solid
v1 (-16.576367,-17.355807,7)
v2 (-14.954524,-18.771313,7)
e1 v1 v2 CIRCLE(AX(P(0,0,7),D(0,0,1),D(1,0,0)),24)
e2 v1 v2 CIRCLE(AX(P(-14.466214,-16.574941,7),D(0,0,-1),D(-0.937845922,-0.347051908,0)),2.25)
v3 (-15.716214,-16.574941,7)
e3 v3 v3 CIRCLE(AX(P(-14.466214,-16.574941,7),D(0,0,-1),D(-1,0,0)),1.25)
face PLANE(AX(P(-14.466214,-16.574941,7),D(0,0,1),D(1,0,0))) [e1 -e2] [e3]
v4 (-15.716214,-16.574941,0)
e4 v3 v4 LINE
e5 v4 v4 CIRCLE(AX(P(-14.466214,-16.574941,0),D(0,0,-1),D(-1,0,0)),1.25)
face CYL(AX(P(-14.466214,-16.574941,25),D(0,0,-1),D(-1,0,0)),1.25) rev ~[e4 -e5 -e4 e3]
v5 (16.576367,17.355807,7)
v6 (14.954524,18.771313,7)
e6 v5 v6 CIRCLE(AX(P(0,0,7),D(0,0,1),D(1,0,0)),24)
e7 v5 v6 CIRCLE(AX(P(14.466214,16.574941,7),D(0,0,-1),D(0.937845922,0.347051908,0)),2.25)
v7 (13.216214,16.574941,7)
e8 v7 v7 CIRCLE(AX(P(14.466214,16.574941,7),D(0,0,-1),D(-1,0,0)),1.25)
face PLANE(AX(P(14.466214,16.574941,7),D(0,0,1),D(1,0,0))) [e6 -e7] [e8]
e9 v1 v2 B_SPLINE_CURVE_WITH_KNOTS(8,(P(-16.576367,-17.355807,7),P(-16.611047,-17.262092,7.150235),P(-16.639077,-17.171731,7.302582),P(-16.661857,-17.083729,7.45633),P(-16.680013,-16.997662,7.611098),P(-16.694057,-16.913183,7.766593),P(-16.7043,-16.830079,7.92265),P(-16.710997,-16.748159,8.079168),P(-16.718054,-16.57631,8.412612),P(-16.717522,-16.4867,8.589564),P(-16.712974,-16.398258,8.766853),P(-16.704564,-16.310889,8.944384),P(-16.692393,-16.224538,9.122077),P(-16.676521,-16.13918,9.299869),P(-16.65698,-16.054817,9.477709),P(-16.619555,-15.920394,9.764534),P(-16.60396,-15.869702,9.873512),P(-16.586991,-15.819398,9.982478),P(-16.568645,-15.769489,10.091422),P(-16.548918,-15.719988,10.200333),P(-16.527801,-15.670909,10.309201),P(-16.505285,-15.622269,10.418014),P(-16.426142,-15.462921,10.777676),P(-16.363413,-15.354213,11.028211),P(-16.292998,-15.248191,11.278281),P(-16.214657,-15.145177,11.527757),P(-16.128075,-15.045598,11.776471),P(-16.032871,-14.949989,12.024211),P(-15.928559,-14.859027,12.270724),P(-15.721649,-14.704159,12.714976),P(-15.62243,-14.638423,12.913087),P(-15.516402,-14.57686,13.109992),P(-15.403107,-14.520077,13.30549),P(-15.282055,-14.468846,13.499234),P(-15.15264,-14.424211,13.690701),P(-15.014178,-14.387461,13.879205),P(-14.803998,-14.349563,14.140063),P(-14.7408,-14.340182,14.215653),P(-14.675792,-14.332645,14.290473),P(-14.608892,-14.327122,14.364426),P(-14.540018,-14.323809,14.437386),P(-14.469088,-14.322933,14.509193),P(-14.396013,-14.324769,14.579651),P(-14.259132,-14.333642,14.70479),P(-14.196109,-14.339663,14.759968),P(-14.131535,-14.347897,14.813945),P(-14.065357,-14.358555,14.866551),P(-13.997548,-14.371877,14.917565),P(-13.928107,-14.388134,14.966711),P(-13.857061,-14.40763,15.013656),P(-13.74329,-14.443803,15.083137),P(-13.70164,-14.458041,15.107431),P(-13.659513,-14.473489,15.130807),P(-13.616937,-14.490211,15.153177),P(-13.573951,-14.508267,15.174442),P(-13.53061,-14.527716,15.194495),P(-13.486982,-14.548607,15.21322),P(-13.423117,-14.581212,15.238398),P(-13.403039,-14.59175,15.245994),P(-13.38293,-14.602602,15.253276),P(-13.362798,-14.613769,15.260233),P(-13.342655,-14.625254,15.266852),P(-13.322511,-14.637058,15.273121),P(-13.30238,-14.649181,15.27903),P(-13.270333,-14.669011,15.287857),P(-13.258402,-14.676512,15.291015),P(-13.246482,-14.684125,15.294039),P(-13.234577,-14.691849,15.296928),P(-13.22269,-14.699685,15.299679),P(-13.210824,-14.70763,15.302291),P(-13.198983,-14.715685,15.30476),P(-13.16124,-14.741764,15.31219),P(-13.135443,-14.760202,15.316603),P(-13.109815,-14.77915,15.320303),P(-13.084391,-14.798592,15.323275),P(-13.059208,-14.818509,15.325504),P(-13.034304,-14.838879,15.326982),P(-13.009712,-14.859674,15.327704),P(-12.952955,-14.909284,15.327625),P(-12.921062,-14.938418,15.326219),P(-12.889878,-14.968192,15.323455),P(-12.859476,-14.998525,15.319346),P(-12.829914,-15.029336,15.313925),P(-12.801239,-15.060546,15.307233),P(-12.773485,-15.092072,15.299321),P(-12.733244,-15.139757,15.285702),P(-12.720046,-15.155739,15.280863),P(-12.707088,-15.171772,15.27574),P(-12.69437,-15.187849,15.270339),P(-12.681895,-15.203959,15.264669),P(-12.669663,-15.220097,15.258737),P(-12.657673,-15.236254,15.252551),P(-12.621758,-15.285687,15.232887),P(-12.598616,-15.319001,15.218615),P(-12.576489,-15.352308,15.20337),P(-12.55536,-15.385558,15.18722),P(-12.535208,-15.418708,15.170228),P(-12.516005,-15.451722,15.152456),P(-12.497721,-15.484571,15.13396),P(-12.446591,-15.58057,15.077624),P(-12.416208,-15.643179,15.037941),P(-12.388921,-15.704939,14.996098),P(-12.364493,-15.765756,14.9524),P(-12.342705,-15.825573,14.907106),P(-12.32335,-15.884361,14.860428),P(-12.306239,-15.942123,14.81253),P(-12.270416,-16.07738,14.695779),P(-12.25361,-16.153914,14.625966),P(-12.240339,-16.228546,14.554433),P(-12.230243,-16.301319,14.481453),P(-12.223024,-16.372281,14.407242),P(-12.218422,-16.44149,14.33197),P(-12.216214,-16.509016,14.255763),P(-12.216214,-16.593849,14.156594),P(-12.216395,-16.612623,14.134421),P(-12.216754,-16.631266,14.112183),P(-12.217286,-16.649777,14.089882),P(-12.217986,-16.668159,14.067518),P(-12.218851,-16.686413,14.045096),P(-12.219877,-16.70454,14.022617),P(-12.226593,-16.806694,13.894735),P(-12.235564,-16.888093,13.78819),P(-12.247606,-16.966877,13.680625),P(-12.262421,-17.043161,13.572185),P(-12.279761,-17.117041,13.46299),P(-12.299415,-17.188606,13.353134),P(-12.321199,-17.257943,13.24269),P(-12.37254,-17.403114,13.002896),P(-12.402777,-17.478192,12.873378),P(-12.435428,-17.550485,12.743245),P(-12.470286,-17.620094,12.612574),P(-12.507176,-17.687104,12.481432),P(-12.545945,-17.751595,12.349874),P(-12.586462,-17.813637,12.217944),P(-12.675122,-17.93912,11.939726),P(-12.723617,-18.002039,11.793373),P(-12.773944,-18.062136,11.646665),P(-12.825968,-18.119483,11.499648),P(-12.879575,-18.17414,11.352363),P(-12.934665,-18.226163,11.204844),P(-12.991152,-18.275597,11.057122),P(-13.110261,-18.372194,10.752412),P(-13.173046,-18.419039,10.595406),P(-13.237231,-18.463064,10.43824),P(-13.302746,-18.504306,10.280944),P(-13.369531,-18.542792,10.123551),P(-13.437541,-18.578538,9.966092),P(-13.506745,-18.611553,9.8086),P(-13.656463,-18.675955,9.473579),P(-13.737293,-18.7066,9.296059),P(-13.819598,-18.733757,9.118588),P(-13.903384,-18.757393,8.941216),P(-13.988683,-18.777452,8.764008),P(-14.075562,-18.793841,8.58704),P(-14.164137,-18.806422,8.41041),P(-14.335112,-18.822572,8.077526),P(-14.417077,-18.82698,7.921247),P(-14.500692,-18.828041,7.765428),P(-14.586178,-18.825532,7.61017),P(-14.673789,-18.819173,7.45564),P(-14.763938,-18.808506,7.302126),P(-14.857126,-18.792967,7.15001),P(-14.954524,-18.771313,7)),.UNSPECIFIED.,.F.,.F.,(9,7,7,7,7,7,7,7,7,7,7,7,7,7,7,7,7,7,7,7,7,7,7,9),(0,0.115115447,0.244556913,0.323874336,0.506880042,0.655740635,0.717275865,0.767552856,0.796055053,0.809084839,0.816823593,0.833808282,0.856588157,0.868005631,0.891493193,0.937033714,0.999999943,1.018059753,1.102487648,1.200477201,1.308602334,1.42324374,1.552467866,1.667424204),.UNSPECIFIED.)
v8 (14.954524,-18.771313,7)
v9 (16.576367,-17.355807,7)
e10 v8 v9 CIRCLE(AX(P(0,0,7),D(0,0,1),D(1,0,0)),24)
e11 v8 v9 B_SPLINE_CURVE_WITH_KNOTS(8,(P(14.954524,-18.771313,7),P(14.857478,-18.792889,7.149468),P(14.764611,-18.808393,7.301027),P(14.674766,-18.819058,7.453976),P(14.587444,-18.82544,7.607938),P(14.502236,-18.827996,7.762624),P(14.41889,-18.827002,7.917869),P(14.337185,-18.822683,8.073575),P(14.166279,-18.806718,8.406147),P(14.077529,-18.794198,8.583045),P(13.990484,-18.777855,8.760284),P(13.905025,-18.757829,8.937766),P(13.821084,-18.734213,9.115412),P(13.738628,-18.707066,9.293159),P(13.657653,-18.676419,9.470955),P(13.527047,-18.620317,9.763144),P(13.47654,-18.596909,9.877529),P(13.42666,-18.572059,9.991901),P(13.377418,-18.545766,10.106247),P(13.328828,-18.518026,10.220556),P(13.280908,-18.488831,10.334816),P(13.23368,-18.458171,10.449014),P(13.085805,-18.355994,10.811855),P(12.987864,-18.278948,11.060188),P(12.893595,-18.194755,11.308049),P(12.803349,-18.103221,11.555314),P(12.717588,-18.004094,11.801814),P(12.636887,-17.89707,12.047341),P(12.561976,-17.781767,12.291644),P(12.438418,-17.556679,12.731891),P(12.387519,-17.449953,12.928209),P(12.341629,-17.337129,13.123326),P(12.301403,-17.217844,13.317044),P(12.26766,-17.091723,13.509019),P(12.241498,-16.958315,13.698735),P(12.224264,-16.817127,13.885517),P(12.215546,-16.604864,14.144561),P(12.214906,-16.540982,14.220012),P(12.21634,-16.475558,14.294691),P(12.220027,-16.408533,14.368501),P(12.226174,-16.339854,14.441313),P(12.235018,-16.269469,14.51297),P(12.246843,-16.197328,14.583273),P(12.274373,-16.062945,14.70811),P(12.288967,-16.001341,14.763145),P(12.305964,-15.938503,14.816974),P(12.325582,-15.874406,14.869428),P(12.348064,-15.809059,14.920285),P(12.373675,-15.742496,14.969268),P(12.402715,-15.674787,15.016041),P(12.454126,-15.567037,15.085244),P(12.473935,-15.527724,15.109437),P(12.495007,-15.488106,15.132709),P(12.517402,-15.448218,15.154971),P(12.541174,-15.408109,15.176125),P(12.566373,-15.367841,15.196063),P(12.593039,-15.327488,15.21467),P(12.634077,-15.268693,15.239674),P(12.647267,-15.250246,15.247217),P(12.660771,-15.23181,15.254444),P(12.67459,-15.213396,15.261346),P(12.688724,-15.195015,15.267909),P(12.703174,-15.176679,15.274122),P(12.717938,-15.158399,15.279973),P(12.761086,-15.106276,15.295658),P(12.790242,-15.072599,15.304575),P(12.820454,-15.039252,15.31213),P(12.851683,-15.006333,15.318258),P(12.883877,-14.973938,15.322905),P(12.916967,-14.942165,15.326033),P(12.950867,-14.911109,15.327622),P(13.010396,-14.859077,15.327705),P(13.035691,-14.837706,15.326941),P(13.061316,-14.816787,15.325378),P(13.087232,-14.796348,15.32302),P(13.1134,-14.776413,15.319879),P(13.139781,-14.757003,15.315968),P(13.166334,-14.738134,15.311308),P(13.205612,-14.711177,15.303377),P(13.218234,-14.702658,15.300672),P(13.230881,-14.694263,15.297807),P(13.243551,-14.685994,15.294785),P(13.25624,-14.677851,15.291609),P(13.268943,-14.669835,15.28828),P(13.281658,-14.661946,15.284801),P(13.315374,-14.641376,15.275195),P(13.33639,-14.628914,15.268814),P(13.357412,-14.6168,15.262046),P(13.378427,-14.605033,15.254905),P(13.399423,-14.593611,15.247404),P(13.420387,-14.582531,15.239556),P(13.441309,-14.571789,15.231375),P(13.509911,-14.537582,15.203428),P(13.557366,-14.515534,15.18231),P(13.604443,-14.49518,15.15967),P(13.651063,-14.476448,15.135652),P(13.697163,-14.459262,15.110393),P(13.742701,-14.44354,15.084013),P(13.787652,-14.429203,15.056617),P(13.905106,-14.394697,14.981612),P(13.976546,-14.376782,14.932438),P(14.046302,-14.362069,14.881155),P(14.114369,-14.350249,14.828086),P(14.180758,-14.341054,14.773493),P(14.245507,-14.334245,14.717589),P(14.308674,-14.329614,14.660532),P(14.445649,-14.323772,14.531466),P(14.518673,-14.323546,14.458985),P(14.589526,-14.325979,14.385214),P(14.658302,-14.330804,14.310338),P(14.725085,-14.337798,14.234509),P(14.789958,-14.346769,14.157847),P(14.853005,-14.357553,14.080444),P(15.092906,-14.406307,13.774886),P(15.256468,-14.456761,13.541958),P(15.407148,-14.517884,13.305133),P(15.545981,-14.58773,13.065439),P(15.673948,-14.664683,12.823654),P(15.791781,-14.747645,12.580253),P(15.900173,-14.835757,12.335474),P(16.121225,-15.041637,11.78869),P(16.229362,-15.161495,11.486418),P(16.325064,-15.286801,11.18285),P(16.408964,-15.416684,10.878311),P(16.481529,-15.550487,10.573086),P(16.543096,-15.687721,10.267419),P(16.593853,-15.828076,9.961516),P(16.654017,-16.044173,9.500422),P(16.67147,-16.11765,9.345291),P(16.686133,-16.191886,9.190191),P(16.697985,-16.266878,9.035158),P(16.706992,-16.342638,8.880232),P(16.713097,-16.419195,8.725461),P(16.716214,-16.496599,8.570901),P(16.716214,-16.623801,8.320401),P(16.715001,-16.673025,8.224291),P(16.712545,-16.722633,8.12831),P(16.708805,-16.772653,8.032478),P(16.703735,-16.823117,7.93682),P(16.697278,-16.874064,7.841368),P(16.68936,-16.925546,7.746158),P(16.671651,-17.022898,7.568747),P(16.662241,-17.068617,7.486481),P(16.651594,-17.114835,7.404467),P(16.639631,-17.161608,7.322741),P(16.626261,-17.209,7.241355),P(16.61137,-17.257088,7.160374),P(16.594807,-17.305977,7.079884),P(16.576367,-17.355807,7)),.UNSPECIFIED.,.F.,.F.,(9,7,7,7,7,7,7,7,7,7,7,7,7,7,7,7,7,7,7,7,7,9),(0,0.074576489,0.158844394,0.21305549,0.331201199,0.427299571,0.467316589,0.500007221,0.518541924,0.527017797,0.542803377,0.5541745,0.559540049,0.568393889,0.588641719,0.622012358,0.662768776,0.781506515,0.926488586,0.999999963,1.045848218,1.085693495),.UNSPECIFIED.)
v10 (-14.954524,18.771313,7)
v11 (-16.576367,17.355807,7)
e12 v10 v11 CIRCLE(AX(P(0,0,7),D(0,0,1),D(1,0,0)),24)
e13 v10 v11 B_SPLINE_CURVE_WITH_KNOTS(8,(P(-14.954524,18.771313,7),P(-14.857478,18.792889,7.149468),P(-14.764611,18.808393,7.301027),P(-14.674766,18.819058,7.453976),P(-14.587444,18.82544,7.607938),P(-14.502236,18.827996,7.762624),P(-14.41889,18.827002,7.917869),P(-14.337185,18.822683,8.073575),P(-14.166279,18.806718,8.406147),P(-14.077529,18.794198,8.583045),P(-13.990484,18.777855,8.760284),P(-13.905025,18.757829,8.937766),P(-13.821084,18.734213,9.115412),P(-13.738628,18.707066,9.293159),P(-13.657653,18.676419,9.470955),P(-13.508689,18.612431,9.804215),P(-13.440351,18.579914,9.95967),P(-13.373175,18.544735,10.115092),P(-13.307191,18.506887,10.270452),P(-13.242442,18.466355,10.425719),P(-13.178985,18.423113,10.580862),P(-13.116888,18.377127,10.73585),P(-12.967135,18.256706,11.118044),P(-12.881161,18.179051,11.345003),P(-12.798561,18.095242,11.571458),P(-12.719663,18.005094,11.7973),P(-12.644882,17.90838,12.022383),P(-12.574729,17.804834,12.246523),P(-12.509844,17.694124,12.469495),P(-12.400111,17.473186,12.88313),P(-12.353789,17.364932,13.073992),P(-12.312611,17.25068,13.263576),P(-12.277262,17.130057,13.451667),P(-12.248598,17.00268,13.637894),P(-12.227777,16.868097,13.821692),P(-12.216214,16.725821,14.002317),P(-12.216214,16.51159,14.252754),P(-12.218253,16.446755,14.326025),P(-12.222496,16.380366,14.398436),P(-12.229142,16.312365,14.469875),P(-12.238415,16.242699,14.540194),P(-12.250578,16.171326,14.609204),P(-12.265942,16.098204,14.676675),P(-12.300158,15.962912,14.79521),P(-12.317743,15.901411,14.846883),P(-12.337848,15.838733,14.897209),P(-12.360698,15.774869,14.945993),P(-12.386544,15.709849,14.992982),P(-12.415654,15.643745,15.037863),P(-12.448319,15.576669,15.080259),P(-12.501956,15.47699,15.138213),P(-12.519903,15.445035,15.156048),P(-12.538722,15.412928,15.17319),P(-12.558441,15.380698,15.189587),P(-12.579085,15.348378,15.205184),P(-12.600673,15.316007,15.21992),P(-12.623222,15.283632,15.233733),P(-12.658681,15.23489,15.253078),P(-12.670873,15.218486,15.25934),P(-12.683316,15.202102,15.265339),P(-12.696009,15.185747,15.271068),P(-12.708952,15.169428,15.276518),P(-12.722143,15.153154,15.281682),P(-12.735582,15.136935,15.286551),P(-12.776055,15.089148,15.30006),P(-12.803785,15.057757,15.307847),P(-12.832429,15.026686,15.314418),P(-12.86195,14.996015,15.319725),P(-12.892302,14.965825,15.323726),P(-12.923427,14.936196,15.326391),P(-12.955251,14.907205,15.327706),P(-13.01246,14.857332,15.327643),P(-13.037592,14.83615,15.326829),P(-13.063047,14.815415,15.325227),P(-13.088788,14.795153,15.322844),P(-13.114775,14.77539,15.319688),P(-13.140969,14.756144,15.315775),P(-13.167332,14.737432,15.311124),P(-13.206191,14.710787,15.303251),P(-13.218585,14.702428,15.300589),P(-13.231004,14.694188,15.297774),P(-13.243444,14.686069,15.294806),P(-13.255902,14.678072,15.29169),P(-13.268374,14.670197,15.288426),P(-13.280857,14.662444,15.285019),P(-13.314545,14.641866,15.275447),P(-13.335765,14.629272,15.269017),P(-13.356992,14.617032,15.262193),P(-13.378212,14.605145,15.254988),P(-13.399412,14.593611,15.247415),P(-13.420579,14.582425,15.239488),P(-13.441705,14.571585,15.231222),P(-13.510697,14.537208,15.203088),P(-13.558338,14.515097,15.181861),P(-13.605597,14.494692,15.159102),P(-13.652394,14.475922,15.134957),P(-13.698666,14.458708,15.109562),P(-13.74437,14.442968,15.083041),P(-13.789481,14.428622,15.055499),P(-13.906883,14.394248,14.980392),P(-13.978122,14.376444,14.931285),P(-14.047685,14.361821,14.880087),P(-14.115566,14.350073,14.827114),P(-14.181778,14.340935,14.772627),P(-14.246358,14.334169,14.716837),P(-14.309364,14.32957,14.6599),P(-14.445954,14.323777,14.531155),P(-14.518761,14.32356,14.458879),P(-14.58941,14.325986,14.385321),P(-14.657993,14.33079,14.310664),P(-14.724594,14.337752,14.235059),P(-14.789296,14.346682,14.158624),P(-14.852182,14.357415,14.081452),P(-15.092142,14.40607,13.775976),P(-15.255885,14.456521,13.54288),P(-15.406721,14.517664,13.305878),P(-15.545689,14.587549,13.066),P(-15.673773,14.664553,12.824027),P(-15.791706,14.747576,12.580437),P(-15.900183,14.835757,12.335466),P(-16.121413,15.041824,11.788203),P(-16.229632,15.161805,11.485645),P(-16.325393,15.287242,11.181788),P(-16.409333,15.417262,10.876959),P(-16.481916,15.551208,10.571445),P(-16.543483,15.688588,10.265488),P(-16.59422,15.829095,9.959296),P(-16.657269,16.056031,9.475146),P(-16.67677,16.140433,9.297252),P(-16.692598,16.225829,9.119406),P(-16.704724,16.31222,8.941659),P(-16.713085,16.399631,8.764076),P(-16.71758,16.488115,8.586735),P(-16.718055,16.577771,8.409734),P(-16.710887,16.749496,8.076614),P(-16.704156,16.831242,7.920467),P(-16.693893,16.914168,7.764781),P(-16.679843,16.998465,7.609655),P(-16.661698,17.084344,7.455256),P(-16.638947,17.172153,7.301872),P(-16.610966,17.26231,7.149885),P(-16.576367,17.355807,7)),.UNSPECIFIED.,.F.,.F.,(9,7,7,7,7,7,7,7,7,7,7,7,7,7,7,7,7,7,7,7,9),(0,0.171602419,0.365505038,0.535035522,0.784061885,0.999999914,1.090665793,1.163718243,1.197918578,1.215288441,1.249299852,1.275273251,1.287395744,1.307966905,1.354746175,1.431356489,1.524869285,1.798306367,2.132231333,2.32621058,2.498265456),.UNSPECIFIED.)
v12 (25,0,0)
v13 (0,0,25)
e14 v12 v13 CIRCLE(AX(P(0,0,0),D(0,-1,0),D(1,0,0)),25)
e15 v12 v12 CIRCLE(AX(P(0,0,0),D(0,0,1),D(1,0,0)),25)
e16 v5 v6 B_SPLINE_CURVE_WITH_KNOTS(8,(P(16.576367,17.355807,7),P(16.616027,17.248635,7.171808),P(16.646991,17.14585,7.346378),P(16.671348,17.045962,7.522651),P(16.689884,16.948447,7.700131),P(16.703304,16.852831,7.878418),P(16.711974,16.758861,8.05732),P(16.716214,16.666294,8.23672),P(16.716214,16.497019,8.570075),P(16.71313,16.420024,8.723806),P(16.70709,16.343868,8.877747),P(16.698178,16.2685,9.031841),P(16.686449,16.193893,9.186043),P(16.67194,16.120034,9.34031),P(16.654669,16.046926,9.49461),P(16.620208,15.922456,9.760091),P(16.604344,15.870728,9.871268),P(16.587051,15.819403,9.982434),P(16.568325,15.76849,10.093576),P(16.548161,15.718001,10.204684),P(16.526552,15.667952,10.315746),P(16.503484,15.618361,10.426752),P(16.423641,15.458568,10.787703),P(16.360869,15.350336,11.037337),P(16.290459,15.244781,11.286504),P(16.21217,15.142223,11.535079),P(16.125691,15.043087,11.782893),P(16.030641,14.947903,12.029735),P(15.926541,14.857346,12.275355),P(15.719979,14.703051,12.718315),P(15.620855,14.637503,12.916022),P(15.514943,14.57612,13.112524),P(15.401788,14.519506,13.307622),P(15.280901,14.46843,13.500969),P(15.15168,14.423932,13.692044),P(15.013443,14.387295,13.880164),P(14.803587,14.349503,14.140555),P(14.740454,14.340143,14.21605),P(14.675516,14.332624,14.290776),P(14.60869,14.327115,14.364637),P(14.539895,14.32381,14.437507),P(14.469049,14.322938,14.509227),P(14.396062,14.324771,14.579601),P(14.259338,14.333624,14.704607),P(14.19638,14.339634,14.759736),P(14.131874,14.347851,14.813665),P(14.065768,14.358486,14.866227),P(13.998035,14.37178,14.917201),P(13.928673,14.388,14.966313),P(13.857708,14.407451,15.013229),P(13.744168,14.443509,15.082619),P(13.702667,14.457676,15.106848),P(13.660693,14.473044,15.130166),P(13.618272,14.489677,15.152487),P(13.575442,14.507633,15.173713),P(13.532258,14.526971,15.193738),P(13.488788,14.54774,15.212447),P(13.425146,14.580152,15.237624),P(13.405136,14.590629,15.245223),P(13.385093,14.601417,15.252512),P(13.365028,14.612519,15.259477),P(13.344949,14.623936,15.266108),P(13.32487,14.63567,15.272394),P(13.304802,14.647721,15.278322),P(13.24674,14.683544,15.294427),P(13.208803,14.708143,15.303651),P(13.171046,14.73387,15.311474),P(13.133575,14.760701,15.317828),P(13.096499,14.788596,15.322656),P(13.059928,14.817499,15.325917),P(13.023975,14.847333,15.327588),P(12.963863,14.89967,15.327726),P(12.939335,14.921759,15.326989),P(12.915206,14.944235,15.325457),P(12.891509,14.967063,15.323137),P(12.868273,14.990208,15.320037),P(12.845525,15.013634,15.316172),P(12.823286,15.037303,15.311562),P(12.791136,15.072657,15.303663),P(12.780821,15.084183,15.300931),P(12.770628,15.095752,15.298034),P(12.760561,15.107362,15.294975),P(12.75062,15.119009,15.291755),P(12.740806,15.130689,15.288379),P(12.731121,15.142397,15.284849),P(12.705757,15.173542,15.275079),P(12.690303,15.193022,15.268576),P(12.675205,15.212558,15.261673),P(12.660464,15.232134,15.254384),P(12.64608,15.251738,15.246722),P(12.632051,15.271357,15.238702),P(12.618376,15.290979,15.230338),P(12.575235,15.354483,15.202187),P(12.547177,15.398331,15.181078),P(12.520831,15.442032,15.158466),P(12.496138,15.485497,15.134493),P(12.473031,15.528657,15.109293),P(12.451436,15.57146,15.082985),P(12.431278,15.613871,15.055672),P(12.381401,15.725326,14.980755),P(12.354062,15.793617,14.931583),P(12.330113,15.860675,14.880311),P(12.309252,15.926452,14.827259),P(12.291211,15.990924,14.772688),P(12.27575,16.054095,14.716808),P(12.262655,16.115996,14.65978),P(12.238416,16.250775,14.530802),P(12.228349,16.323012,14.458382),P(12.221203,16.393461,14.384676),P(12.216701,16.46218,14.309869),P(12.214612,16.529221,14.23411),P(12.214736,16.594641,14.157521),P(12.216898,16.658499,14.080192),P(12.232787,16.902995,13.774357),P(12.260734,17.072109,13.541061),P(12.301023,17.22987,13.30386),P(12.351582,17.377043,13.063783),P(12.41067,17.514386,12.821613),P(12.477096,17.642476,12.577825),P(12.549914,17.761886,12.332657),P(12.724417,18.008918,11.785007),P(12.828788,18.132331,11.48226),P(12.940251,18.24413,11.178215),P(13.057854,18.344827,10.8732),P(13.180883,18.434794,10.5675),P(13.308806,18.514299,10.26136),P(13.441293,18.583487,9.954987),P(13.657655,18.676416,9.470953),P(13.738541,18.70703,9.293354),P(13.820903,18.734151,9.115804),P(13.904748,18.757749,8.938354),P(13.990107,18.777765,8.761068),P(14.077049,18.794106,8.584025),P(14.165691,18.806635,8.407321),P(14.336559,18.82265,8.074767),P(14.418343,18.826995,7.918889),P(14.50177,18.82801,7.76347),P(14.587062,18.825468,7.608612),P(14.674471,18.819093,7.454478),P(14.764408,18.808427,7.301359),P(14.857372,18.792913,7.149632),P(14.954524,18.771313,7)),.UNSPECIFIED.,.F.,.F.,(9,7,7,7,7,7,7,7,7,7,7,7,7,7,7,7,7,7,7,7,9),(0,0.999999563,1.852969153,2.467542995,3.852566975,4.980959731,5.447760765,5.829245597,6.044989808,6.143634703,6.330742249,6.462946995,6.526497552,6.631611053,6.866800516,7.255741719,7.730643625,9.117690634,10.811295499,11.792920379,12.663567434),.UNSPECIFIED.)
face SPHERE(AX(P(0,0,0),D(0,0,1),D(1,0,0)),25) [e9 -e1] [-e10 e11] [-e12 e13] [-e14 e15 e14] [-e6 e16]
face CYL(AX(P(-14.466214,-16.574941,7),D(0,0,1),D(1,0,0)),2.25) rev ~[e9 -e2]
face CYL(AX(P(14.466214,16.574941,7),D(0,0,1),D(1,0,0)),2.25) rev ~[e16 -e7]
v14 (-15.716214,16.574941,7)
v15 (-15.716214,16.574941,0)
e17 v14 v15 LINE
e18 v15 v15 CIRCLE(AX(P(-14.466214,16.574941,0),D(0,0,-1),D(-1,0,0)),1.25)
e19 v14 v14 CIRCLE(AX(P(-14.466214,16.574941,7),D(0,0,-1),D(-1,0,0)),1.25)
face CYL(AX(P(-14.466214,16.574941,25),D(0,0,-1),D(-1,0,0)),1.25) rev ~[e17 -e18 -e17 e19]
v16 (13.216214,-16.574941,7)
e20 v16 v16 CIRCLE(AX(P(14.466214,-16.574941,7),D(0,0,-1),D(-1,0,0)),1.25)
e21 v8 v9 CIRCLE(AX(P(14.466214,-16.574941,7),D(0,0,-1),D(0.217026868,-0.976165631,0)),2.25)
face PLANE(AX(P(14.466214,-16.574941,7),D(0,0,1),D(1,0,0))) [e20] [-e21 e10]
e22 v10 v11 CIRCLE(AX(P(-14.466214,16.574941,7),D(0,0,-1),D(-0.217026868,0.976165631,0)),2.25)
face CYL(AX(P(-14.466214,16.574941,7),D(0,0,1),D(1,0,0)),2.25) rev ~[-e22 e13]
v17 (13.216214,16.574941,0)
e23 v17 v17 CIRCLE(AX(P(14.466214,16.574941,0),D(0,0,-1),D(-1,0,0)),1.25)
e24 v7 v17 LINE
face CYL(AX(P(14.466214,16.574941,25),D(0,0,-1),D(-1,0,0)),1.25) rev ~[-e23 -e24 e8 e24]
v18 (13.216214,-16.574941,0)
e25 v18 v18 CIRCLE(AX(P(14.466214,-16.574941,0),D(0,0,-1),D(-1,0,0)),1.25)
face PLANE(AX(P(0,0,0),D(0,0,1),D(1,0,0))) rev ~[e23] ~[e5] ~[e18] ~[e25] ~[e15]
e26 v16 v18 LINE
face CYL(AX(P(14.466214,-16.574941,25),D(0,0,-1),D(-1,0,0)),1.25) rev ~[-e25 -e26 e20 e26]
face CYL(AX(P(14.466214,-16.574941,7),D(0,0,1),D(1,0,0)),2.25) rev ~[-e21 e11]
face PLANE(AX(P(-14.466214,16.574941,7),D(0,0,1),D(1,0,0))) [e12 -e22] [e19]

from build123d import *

# Parameters (mm, degrees)
F0_R           = 25
F1_DEPTH       = 25
F3_D           = 2.5
F3_CBORE_D     = 4.5
F3_CBORE_DEPTH = 18


# Not quite as in the source:
# - a fillet or chamfer that OpenCascade refuses, or shapes differently, is made with other operations: its cross-section is extruded or revolved along the edge and cut away or added


with BuildPart() as f1:
    # F0 (on Top) → F1 (new body)
    with BuildSketch(Plane.XY):
        Circle(F0_R)
    extrude(amount=F1_DEPTH)

    # F3 (through all)
    with Locations(Plane.XY.offset(25)):
        with Locations((14.4662138687, 16.5749406124), (14.4662138687, -16.5749406124), (-14.4662138687, -16.5749406124), (-14.4662138687, 16.5749406124)):
            CounterBoreHole(F3_D / 2, F3_CBORE_D / 2, F3_CBORE_DEPTH)

    # F4: fillet of radius 25 on 1 edges, made by hand

    # F4_s1 → F4_t2 (revolve, cut)
    with BuildSketch(Plane.XZ):
        with BuildLine():
            ThreePointArc((25, 0), (17.6776695297, 17.6776695297), (0, 25))
            Line((0, 25), (25, 25))
            Line((25, 25), (25, 0))
        make_face()
    revolve(axis=Axis((0, 0, 25), (0, 0, 1)), mode=Mode.SUBTRACT)


solid = f1.part
